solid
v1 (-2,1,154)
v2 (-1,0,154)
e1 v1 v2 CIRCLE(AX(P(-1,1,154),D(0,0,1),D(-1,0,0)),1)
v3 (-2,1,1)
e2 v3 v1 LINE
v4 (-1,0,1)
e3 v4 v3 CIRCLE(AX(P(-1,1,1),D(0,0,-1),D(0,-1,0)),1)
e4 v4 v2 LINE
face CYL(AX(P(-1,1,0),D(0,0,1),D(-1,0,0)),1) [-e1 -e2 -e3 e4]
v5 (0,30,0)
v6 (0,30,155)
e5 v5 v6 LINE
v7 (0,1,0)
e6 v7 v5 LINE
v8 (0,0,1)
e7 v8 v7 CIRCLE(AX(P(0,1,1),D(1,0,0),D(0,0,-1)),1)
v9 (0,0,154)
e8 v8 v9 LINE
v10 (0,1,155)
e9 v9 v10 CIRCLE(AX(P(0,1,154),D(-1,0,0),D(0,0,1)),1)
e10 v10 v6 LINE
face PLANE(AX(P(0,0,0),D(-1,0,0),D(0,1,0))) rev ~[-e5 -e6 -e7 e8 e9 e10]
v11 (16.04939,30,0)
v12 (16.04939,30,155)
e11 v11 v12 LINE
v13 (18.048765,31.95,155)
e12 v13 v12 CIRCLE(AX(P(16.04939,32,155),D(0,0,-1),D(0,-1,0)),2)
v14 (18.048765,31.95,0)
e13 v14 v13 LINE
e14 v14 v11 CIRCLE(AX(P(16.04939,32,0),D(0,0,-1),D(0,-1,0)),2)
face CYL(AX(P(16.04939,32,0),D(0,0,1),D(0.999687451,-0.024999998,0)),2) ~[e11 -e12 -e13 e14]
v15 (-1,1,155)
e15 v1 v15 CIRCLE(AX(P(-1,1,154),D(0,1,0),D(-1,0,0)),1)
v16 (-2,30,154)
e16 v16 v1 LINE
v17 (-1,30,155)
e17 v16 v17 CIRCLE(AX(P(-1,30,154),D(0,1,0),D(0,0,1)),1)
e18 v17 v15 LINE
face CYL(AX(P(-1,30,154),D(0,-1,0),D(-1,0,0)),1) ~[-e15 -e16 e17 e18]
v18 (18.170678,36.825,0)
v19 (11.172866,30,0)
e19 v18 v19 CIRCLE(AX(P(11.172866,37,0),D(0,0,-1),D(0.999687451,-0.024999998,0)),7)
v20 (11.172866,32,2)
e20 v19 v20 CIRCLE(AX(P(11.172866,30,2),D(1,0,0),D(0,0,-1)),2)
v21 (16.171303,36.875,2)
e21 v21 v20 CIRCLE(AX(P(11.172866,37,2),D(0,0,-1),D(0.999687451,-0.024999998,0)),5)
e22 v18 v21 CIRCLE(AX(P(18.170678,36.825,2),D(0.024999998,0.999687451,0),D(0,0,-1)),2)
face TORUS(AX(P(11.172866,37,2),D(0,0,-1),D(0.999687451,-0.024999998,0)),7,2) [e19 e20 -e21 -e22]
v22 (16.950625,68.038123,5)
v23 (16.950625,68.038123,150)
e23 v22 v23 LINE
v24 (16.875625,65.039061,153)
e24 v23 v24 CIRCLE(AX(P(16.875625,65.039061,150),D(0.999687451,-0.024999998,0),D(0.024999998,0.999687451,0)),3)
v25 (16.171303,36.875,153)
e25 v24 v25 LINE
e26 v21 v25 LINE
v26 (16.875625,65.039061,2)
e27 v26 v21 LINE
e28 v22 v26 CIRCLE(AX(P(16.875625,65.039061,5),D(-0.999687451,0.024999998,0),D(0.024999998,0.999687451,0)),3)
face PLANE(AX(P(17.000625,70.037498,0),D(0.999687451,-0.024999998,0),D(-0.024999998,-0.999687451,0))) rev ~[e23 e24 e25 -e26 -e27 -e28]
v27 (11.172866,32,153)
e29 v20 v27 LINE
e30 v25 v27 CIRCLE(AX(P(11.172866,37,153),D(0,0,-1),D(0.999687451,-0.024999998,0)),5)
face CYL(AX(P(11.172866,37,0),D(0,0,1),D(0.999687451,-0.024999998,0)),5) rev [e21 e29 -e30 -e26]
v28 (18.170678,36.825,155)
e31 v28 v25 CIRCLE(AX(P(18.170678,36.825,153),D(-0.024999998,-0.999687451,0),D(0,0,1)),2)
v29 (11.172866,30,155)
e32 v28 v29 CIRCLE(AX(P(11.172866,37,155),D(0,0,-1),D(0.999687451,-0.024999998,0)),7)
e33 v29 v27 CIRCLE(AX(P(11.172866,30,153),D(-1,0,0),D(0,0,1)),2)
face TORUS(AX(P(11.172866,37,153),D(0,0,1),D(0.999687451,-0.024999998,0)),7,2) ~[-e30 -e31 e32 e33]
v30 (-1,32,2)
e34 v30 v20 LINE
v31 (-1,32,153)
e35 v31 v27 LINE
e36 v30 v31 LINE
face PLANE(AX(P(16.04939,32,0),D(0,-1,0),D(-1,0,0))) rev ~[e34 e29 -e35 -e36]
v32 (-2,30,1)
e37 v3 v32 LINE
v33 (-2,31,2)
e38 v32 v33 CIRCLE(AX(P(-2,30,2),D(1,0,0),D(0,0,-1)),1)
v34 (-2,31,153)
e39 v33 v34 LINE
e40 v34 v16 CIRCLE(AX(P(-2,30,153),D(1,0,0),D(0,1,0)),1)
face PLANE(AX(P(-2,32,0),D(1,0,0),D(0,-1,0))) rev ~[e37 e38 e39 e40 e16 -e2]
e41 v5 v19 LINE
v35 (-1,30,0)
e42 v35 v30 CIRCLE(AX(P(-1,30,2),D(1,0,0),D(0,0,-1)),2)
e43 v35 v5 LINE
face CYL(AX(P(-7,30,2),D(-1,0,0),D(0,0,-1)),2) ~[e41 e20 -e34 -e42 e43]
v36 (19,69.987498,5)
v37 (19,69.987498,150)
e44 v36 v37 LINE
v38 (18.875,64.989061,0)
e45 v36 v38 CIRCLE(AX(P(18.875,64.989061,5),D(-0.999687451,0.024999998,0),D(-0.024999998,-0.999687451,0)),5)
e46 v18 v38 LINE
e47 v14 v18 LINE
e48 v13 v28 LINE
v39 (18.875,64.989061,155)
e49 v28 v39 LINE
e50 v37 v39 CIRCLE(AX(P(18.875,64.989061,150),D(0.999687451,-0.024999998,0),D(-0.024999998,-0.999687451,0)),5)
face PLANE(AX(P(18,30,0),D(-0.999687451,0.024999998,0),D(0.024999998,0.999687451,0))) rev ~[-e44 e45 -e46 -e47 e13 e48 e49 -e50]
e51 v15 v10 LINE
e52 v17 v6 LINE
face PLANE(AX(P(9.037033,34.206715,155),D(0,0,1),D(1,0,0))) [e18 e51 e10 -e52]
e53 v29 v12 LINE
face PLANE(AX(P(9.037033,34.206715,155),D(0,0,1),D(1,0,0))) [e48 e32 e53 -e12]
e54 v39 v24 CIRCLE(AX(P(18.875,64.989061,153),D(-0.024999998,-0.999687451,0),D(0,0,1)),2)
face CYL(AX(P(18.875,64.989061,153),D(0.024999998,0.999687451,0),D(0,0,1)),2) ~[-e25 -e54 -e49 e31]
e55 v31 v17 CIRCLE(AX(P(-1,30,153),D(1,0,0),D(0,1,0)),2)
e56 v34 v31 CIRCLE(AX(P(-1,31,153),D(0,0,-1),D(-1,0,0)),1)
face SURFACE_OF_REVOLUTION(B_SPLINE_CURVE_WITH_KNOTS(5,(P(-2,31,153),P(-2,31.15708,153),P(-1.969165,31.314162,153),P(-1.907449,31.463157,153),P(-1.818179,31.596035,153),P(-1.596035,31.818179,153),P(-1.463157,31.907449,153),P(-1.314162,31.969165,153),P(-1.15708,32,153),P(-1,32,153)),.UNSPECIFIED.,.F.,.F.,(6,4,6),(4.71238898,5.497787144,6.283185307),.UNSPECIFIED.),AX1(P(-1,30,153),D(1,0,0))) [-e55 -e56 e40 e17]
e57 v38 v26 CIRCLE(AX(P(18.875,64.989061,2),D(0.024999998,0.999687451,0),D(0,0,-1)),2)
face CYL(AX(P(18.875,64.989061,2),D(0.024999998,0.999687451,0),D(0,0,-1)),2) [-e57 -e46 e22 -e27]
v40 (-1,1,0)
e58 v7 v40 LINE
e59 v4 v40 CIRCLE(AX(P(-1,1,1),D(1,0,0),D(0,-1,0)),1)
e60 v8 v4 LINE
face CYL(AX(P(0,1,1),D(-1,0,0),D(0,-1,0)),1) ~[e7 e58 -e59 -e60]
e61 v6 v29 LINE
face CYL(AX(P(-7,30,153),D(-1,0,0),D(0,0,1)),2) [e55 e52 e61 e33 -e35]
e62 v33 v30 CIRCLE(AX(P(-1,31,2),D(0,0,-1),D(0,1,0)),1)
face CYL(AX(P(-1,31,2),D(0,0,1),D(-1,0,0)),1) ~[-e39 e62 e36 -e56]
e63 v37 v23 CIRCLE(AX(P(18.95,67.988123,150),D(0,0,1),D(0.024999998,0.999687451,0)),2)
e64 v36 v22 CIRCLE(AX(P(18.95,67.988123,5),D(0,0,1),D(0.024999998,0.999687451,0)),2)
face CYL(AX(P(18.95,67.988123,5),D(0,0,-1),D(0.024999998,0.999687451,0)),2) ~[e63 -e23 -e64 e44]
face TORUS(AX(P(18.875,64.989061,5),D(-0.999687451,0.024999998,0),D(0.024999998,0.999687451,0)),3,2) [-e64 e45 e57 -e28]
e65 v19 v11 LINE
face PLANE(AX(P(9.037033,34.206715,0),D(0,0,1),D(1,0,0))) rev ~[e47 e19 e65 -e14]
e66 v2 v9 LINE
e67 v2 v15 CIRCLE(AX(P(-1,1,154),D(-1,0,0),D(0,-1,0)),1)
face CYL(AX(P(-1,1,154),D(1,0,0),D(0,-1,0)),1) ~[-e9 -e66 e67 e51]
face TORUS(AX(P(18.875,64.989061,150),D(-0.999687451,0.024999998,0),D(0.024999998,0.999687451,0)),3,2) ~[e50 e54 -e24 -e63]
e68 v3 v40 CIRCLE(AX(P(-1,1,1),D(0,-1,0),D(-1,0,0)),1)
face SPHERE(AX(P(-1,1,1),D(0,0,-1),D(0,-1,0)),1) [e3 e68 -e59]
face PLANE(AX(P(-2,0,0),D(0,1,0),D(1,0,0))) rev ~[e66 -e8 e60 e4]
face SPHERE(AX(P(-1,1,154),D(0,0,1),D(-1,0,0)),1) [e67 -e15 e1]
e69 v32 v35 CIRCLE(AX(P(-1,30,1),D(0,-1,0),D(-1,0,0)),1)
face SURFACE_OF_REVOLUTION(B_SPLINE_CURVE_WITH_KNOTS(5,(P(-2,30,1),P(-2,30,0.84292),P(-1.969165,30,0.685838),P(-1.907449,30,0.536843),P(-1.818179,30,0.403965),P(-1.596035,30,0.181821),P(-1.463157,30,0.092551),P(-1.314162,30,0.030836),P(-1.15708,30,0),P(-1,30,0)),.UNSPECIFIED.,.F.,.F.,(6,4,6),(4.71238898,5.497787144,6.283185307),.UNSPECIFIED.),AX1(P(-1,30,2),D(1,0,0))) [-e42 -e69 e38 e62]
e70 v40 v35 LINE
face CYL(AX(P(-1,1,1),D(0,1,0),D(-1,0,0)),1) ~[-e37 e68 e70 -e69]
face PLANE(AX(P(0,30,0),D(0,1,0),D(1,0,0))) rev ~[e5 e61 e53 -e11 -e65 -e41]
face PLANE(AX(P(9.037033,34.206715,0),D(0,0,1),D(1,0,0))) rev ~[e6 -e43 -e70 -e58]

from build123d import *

# Parameters (mm, degrees)
F1_DEPTH     = 155
F2_R         = 5
F3_T1_DEPTH  = 145
F3_T3_DEPTH  = 28.172866076
F3_T5_DEPTH  = 18.1728662684
F3_T8_ANGLE  = 90
F3_T10_ANGLE = 90
F3_T12_ANGLE = 88.5674563985
F3_T14_ANGLE = 88.5674563985
F4_R         = 2
F5_R         = 1
F6_R         = 1


# Not quite as in the source:
# - a fillet or chamfer that OpenCascade refuses, or shapes differently, is made with other operations: its cross-section is extruded or revolved along the edge and cut away or added


with BuildPart() as f1:
    # F0 (on Top) → F1 (new body)
    with BuildSketch(Plane.XY):
        Polygon((-2.000000095, 0), (0, 0), (0, 30), (18, 30), (18.999999905, 69.9874980486), (17.0006250026, 70.0374980439), (16.0493903369, 32.000000095), (-2.000000095, 32.000000095), align=None)
    extrude(amount=F1_DEPTH)

    # F2
    f2_edges = [f1.edges().sort_by_distance(p)[0] for p in [
        (16.04939, 32, 77.5),
        (18.000312, 70.012498, 155),
        (18.000312, 70.012498, 0),
    ]]
    fillet(f2_edges, radius=F2_R)

    # F3: fillet of radius 2 on 6 edges, made by hand

    # F3_s2 → F3_t1 (cut)
    with BuildSketch(Plane.XY.offset(5)):
        with BuildLine():
            ThreePointArc((18.999999905, 69.9874980486), (17.5715836938, 69.4372500336), (16.9506250073, 68.0381231415))
            Line((16.9506250073, 68.0381231415), (17.0006250026, 70.0374980439))
            Line((17.0006250026, 70.0374980439), (18.999999905, 69.9874980486))
        make_face()
    extrude(amount=F3_T1_DEPTH, mode=Mode.SUBTRACT)

    # F3_s4 → F3_t3 (cut)
    with BuildSketch(Plane(origin=(1.6360154319, 65.4201701064, 0), x_dir=(0, 0, 1), z_dir=(-0.0249999976, -0.9996874512, 0))):
        with BuildLine():
            ThreePointArc((0, -17.2443741931), (0.5857864376, -15.8301606308), (2, -15.2443741931))
            Line((2, -15.2443741931), (0, -15.2443741931))
            Line((0, -15.2443741931), (0, -17.2443741931))
        make_face()
        with BuildLine():
            ThreePointArc((155, -17.2443741931), (154.4142135624, -15.8301606308), (153, -15.2443741931))
            Line((153, -15.2443741931), (155, -15.2443741931))
            Line((155, -15.2443741931), (155, -17.2443741931))
        make_face()
    extrude(amount=F3_T3_DEPTH, mode=Mode.SUBTRACT)

    # F3_s6 → F3_t5 (cut)
    with BuildSketch(Plane.YZ.offset(-7.000000095)):
        with BuildLine():
            ThreePointArc((30.000000095, 155), (31.4142136574, 154.4142135624), (32.000000095, 153))
            Line((32.000000095, 153), (32.000000095, 155))
            Line((32.000000095, 155), (30.000000095, 155))
        make_face()
        with BuildLine():
            ThreePointArc((30.000000095, 0), (31.4142136574, 0.5857864376), (32.000000095, 2))
            Line((32.000000095, 2), (32.000000095, 0))
            Line((32.000000095, 0), (30.000000095, 0))
        make_face()
    extrude(amount=F3_T5_DEPTH, mode=Mode.SUBTRACT)

    # F3_s7 → F3_t8 (revolve, cut)
    with BuildSketch(Plane.XY.offset(5)):
        with BuildLine():
            ThreePointArc((18.999999905, 69.9874980486), (17.5715836938, 69.4372500336), (16.9506250073, 68.0381231415))
            Line((16.9506250073, 68.0381231415), (17.0006250026, 70.0374980439))
            Line((17.0006250026, 70.0374980439), (18.999999905, 69.9874980486))
        make_face()
    revolve(axis=Axis((16.8756250144, 65.0390607878, 5), (-0.9996874512, 0.0249999976, 0)), revolution_arc=F3_T8_ANGLE, mode=Mode.SUBTRACT)

    # F3_s9 → F3_t10 (revolve, cut)
    with BuildSketch(Plane.XY.offset(150)):
        with BuildLine():
            ThreePointArc((18.999999905, 69.9874980486), (17.5715836938, 69.4372500336), (16.9506250073, 68.0381231415))
            Line((16.9506250073, 68.0381231415), (17.0006250026, 70.0374980439))
            Line((17.0006250026, 70.0374980439), (18.999999905, 69.9874980486))
        make_face()
    revolve(axis=Axis((16.8756250144, 65.0390607878, 150), (0.9996874512, -0.0249999976, 0)), revolution_arc=F3_T10_ANGLE, mode=Mode.SUBTRACT)

    # F3_s11 → F3_t12 (revolve, cut)
    with BuildSketch(Plane(origin=(0.9316938469, 37.2561094255, 0), x_dir=(0, 0, 1), z_dir=(0.0249999976, 0.9996874512, 0))):
        with BuildLine():
            ThreePointArc((155, 17.2443741931), (154.4142135624, 15.8301606308), (153, 15.2443741931))
            Line((153, 15.2443741931), (155, 15.2443741931))
            Line((155, 15.2443741931), (155, 17.2443741931))
        make_face()
    revolve(axis=Axis((11.1728661734, 37.000000095, 155), (0, 0, -1)), revolution_arc=F3_T12_ANGLE, mode=Mode.SUBTRACT)

    # F3_s13 → F3_t14 (revolve, cut)
    with BuildSketch(Plane(origin=(0.9316938469, 37.2561094255, 0), x_dir=(0, 0, 1), z_dir=(0.0249999976, 0.9996874512, 0))):
        with BuildLine():
            ThreePointArc((0, 17.2443741931), (0.5857864376, 15.8301606308), (2, 15.2443741931))
            Line((2, 15.2443741931), (0, 15.2443741931))
            Line((0, 15.2443741931), (0, 17.2443741931))
        make_face()
    revolve(axis=Axis((11.1728661734, 37.000000095, 0), (0, 0, -1)), revolution_arc=F3_T14_ANGLE, mode=Mode.SUBTRACT)

    # F4
    f4_edges = [f1.edges().sort_by_distance(p)[0] for p in [
        (18, 30, 77.5),
    ]]
    fillet(f4_edges, radius=F4_R)

    # F5
    f5_edges = [f1.edges().sort_by_distance(p)[0] for p in [
        (-2, 0, 77.5),
    ]]
    fillet(f5_edges, radius=F5_R)

    # F6
    f6_edges = [f1.edges().sort_by_distance(p)[0] for p in [
        (-2, 32, 77.5),
        (-0.5, 0, 0),
        (-1.707107, 0.292893, 0),
        (-2, 15.5, 0),
        (-0.5, 0, 155),
        (-1.707107, 0.292893, 155),
        (-2, 31.414214, 0.585786),
        (-2, 15.5, 155),
        (-2, 31.414214, 154.414214),
    ]]
    fillet(f6_edges, radius=F6_R)


solid = f1.part
